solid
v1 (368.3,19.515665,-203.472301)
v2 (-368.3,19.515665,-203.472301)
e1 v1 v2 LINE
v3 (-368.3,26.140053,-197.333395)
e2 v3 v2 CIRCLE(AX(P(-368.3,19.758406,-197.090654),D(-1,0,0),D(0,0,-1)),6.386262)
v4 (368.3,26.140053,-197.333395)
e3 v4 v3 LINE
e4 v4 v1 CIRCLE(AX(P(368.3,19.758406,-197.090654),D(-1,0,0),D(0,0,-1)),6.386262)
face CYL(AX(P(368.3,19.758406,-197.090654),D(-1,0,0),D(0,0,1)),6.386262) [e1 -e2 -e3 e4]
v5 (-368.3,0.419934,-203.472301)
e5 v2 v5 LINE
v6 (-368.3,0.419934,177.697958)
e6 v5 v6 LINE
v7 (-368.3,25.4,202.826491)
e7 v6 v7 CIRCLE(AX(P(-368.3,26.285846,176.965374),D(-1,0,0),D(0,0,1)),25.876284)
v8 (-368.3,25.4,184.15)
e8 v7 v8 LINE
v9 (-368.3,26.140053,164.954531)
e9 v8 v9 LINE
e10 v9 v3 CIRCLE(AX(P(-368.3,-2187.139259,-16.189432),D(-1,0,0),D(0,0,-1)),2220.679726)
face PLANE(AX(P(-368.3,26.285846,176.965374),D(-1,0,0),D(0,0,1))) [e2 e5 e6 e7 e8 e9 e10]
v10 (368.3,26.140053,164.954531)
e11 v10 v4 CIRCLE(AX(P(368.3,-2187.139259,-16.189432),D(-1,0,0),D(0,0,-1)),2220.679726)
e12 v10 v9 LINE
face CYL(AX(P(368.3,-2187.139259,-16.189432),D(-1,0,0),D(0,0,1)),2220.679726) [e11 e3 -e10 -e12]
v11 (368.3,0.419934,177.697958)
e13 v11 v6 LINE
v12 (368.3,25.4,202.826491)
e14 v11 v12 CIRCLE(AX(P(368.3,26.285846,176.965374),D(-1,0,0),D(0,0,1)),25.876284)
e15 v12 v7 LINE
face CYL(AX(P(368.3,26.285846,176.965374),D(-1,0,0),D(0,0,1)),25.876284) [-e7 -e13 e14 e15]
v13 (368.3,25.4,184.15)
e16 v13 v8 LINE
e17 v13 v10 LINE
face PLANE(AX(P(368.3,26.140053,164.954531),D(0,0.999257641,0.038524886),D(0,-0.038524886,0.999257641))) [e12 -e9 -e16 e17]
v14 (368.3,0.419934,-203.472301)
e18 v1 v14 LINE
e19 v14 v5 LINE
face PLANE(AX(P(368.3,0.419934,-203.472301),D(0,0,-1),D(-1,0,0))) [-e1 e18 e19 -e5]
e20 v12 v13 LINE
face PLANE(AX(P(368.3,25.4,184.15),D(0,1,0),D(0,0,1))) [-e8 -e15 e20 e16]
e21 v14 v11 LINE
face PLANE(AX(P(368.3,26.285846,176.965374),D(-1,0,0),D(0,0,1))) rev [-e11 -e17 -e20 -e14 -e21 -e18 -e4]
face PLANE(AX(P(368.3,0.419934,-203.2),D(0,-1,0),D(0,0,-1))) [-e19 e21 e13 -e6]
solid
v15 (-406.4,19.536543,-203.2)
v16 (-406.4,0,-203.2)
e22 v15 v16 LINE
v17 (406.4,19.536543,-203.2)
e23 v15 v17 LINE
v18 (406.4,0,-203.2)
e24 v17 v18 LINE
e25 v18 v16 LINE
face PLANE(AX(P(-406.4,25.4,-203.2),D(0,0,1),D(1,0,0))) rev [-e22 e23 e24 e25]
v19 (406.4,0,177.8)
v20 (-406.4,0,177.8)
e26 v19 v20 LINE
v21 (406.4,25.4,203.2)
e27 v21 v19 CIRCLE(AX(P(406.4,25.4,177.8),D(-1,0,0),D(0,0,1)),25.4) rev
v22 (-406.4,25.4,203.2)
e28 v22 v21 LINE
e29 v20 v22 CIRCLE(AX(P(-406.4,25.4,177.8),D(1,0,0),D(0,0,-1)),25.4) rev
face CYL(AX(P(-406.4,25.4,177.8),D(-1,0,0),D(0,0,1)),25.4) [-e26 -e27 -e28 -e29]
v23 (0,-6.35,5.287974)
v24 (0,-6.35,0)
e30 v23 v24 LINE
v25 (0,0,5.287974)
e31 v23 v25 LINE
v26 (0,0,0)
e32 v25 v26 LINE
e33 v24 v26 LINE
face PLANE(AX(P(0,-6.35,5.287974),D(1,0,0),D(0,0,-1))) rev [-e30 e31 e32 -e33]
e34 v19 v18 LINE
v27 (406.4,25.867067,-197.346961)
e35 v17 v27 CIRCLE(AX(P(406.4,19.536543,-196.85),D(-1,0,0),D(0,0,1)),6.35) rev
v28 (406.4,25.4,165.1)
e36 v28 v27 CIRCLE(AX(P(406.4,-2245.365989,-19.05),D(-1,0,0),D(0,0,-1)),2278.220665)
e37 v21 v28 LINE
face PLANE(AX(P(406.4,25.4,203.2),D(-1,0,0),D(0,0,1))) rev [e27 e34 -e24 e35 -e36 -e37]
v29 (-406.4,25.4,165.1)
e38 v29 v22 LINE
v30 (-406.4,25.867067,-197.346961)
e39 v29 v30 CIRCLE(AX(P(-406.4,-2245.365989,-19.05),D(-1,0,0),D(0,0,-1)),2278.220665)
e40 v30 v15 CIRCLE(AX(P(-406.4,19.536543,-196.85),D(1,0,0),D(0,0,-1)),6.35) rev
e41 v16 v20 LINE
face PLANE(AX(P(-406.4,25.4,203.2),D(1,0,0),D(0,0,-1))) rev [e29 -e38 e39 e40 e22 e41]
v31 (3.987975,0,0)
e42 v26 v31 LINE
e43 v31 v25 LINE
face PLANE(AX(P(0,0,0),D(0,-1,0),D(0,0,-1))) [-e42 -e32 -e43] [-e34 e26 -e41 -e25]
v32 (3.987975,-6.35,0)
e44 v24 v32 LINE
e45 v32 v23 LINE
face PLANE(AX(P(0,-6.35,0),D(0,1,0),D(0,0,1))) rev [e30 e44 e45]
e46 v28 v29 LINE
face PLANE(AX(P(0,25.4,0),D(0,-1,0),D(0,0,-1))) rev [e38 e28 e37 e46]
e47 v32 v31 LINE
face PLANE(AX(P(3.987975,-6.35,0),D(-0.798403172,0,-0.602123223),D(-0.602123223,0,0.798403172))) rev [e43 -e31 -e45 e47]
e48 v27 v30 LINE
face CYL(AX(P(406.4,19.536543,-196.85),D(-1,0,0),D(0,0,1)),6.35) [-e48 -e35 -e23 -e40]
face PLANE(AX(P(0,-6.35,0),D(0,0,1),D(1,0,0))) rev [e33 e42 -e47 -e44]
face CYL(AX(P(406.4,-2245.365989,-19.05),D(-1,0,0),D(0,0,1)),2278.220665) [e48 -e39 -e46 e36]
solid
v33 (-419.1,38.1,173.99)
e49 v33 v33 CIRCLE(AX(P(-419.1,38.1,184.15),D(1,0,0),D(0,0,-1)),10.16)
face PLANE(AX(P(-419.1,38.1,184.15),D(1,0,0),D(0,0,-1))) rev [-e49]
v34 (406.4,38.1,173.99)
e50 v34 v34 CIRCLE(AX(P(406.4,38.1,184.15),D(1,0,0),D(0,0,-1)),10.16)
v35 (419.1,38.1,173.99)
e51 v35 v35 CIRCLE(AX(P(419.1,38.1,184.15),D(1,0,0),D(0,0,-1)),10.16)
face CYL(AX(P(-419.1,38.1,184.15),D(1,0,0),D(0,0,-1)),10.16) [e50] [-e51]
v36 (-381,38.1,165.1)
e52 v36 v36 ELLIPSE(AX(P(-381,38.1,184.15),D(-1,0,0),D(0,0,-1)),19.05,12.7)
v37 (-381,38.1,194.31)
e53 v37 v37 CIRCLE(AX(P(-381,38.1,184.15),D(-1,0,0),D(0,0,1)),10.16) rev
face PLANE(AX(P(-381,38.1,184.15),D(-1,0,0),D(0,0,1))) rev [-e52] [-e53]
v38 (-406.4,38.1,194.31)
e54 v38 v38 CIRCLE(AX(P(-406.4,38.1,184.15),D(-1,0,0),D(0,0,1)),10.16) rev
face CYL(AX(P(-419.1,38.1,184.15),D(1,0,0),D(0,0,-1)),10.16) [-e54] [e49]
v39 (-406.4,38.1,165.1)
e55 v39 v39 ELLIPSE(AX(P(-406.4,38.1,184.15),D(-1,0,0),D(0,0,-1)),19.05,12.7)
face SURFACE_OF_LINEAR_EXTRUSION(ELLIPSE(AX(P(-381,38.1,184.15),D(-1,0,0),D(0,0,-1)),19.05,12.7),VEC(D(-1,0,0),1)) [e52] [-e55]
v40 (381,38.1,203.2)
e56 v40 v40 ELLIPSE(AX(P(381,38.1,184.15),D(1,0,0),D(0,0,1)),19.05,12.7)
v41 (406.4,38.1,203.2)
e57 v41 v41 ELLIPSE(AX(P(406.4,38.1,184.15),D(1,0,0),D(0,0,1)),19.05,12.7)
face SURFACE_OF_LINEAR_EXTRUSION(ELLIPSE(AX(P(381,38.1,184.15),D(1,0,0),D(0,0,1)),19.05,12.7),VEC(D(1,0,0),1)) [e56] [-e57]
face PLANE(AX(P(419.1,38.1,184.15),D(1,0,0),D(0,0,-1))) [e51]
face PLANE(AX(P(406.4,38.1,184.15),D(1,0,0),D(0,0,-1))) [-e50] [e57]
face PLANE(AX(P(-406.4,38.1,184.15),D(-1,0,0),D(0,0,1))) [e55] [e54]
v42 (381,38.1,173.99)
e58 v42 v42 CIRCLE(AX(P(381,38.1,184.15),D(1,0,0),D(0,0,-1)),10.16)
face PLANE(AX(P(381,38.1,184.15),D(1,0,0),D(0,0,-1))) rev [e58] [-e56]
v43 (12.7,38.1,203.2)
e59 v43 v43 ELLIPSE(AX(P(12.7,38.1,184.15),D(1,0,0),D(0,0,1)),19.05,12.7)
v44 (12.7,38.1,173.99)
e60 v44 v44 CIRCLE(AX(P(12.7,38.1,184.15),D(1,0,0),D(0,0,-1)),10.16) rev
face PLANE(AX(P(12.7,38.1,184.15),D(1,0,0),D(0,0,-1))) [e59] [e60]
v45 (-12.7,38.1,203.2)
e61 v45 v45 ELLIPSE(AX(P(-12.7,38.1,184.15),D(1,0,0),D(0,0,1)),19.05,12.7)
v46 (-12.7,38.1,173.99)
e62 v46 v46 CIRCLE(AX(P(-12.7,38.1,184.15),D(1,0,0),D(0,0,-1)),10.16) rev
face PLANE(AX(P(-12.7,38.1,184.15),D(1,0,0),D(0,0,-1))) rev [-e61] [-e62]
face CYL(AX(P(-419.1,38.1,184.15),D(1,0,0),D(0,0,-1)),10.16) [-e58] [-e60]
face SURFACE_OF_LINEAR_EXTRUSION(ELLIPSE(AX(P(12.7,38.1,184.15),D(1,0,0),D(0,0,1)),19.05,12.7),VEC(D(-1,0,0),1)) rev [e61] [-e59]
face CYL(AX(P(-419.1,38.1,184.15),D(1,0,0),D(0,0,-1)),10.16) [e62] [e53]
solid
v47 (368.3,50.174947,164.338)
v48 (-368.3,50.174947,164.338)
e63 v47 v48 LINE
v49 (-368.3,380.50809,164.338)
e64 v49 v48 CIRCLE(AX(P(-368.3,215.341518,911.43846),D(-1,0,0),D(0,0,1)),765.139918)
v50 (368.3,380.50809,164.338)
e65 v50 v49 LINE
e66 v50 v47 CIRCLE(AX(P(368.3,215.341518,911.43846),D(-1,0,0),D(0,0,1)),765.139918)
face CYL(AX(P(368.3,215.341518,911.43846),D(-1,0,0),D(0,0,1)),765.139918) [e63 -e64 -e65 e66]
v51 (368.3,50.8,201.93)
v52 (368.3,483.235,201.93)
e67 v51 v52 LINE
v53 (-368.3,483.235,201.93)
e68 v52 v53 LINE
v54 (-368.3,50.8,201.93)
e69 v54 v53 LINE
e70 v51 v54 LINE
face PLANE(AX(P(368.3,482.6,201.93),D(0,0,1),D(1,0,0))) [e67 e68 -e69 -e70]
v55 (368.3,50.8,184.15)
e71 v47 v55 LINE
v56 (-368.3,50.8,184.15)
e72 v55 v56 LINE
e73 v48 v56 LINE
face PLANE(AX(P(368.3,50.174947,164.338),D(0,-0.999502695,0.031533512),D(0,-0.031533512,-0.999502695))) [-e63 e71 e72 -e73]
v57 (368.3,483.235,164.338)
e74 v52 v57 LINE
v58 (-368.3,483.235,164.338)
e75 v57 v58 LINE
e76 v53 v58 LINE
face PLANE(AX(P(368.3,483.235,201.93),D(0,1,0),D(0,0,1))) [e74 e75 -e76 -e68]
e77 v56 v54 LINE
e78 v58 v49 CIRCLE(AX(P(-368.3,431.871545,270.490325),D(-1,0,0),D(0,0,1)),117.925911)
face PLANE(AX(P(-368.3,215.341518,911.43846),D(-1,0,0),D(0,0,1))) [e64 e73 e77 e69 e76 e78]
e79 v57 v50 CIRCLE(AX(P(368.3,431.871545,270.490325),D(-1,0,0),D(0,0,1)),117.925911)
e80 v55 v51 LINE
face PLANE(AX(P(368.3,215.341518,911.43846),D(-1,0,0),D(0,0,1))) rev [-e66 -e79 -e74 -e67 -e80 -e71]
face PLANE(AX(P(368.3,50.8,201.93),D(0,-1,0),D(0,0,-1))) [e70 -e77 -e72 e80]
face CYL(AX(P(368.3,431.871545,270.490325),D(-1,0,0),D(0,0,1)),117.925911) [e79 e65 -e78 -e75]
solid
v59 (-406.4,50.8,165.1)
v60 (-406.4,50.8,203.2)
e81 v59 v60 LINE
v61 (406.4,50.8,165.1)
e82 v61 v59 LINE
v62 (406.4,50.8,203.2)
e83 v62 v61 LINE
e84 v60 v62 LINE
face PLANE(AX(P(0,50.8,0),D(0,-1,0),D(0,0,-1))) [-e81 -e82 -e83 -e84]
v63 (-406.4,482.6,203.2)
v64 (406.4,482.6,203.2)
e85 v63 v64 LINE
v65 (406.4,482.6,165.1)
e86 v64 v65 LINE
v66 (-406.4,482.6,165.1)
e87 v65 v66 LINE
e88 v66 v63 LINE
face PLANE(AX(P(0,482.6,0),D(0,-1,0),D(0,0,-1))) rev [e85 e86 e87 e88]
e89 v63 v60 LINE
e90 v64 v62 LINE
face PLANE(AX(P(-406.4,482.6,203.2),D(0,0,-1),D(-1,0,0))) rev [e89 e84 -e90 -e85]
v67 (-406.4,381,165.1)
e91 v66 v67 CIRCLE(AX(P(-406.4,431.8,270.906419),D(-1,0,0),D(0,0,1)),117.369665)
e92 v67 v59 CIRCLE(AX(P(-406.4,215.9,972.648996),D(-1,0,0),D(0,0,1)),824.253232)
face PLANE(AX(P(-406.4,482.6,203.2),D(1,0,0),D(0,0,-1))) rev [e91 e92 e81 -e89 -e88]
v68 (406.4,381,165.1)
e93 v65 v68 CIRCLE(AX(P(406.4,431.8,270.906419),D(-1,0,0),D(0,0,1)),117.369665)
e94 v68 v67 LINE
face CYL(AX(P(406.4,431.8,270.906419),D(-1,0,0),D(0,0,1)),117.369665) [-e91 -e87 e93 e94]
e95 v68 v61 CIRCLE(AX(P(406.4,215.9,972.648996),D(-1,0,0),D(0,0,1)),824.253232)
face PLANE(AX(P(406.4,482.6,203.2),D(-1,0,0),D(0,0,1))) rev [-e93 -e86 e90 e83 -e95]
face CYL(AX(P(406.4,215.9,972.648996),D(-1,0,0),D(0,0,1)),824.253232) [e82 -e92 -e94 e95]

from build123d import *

# Parameters (mm, degrees)
SKETCH2_W            = 812.8
SKETCH2_H            = 406.4
BOSS_EXTRUDE1_DEPTH  = 25.4
BOSS_EXTRUDE2_START  = 25.4
SKETCH3_W            = 812.8
SKETCH3_H            = 38.1
BOSS_EXTRUDE2_DEPTH  = 431.8
SKETCH4_RX           = 19.05
SKETCH4_RY           = 12.7
BOSS_EXTRUDE3_DEPTH  = 25.4
SKETCH6_RX           = 19.05
SKETCH6_RY           = 12.7
BOSS_EXTRUDE4_DEPTH  = 25.4
BOSS_EXTRUDE5_START  = -419.1
SKETCH7_RX           = 19.05
SKETCH7_RY           = 12.7
BOSS_EXTRUDE5_DEPTH  = 25.4
BOSS_EXTRUDE6_START  = 12.7
SKETCH8_R            = 10.16
BOSS_EXTRUDE6_DEPTH  = 838.2
BOSS_EXTRUDE7_DEPTH  = 812.8
BOSS_EXTRUDE8_DEPTH  = 812.8
FILLET1_R            = 25.4
FILLET2_R            = 6.35
BOSS_EXTRUDE10_START = -38.1
BOSS_EXTRUDE10_DEPTH = 736.6
BOSS_EXTRUDE12_START = -38.1
BOSS_EXTRUDE12_DEPTH = 736.6
BOSS_EXTRUDE13_DEPTH = 6.35


with BuildPart() as part:
    # Sketch2 → Boss-Extrude1 (new body)
    with BuildSketch(Plane(origin=(0, 0, 0), x_dir=(1, 0, 0), z_dir=(0, 1, 0))):
        Rectangle(SKETCH2_W, SKETCH2_H)
    extrude(amount=BOSS_EXTRUDE1_DEPTH)

    # Sketch9 → Boss-Extrude7 (add)
    with BuildSketch(Plane.ZY.offset(406.4)):
        with BuildLine():
            Line((165.1, 25.4), (165.1, 0))
            Line((165.1, 0), (-203.2, 0))
            Line((-203.2, 0), (-203.2, 25.4))
            ThreePointArc((-203.2, 25.4), (-19.05, 32.854676191), (165.1, 25.4))
        make_face()
    extrude(amount=-BOSS_EXTRUDE7_DEPTH)

    # Fillet1
    fillet1_edges = [part.edges().sort_by_distance(p)[0] for p in [
        (0, 0, 203.2),
    ]]
    fillet(fillet1_edges, radius=FILLET1_R - 0.0001)  # a hair under: the kernel refuses the full size

    # Fillet2
    fillet2_edges = [part.edges().sort_by_distance(p)[0] for p in [
        (0, 25.4, -203.2),
    ]]
    fillet(fillet2_edges, radius=FILLET2_R)

    # Sketch13 → Boss-Extrude13 (add)
    with BuildSketch(Plane.XZ):
        Polygon((0, 0), (3.987974883, 0), (0, 5.287973751), align=None)
    extrude(amount=BOSS_EXTRUDE13_DEPTH)


with BuildPart() as body_2:
    # Sketch3 → Boss-Extrude2 (new body)
    with BuildSketch(Plane(origin=(0, 25.4, 0), x_dir=(1, 0, 0), z_dir=(0, 1, 0)).offset(BOSS_EXTRUDE2_START)):
        with Locations((0, -184.15)):
            Rectangle(SKETCH3_W, SKETCH3_H)
    extrude(amount=BOSS_EXTRUDE2_DEPTH)

    # Sketch10 → Boss-Extrude8 (add)
    with BuildSketch(Plane.ZY.offset(406.4)):
        with BuildLine():
            Line((165.1, 381), (165.1, 482.6))
            ThreePointArc((165.1, 482.6), (153.536753819, 431.8), (165.1, 381))
        make_face()
        with BuildLine():
            Line((165.1, 50.8), (165.1, 381))
            ThreePointArc((165.1, 381), (148.3957637, 215.9), (165.1, 50.8))
        make_face()
    extrude(amount=-BOSS_EXTRUDE8_DEPTH)


with BuildPart() as body_3:
    # Sketch4 → Boss-Extrude3 (new body)
    with BuildSketch(Plane(origin=(406.4, 0, 0), x_dir=(0, 0, -1), z_dir=(1, 0, 0))):
        with Locations(Location((-184.15, 38.1), (0, 0, 180))):
            Ellipse(SKETCH4_RX, SKETCH4_RY)
    extrude(amount=-BOSS_EXTRUDE3_DEPTH)



with BuildPart() as body_4:
    # Sketch6 → Boss-Extrude4 (new body)
    with BuildSketch(Plane.ZY.offset(406.4)):
        with Locations(Location((184.15, 38.1), (0, 0, 0))):
            Ellipse(SKETCH6_RX, SKETCH6_RY)
    extrude(amount=-BOSS_EXTRUDE4_DEPTH)


with BuildPart() as body_5:
    # Sketch7 → Boss-Extrude5 (new body)
    with BuildSketch(Plane(origin=(406.4, 0, 0), x_dir=(0, 0, -1), z_dir=(1, 0, 0)).offset(BOSS_EXTRUDE5_START)):
        with Locations(Location((-184.15, 38.1), (0, 0, 180))):
            Ellipse(SKETCH7_RX, SKETCH7_RY)
    extrude(amount=BOSS_EXTRUDE5_DEPTH)


with BuildPart() as body_3_1:
    add(body_3.part)

    add(body_4.part)  # Boss-Extrude6 merges body 4

    add(body_5.part)  # Boss-Extrude6 merges body 5
    # Sketch8 → Boss-Extrude6 (add)
    with BuildSketch(Plane(origin=(406.4, 0, 0), x_dir=(0, 0, -1), z_dir=(1, 0, 0)).offset(BOSS_EXTRUDE6_START)):
        with Locations((-184.15, 38.1)):
            Circle(SKETCH8_R)
    extrude(amount=-BOSS_EXTRUDE6_DEPTH)


with BuildPart() as body_4_2:
    # Sketch11 → Boss-Extrude10 (new body)
    with BuildSketch(Plane.ZY.offset(406.4).offset(BOSS_EXTRUDE10_START)):
        with BuildLine():
            Line((201.93, 482.6), (201.93, 483.235))
            Line((201.93, 483.235), (164.338, 483.235))
            ThreePointArc((164.338, 483.235), (152.564413358, 431.87154481), (164.338, 380.50808962))
            ThreePointArc((164.338, 380.50808962), (146.298542367, 215.341518423), (164.338, 50.174947227))
            Line((164.338, 50.174947227), (184.15, 50.8))
            Line((184.15, 50.8), (201.93, 50.8))
            Line((201.93, 50.8), (201.93, 482.6))
        make_face()
    extrude(amount=-BOSS_EXTRUDE10_DEPTH)


with BuildPart() as body_5_2:
    # Sketch12 → Boss-Extrude12 (new body)
    with BuildSketch(Plane.ZY.offset(406.4).offset(BOSS_EXTRUDE12_START)):
        with BuildLine():
            Line((-203.2, 0.419933844), (-203.472301364, 0.419933844))
            Line((-203.472301364, 0.419933844), (-203.472301364, 19.515665351))
            ThreePointArc((-203.472301364, 19.515665351), (-201.774803561, 24.099268204), (-197.333394693, 26.140052656))
            ThreePointArc((-197.333394693, 26.140052656), (-16.18943201, 33.540467261), (164.954530674, 26.140052656))
            Line((164.954530674, 26.140052656), (184.15, 25.4))
            Line((184.15, 25.4), (202.826490768, 25.4))
            ThreePointArc((202.826490768, 25.4), (195.208376954, 7.934417267), (177.69795785, 0.419933844))
            Line((177.69795785, 0.419933844), (-203.2, 0.419933844))
        make_face()
    extrude(amount=-BOSS_EXTRUDE12_DEPTH)


solid = Compound([part.part, body_2.part, body_3_1.part, body_4_2.part, body_5_2.part])
